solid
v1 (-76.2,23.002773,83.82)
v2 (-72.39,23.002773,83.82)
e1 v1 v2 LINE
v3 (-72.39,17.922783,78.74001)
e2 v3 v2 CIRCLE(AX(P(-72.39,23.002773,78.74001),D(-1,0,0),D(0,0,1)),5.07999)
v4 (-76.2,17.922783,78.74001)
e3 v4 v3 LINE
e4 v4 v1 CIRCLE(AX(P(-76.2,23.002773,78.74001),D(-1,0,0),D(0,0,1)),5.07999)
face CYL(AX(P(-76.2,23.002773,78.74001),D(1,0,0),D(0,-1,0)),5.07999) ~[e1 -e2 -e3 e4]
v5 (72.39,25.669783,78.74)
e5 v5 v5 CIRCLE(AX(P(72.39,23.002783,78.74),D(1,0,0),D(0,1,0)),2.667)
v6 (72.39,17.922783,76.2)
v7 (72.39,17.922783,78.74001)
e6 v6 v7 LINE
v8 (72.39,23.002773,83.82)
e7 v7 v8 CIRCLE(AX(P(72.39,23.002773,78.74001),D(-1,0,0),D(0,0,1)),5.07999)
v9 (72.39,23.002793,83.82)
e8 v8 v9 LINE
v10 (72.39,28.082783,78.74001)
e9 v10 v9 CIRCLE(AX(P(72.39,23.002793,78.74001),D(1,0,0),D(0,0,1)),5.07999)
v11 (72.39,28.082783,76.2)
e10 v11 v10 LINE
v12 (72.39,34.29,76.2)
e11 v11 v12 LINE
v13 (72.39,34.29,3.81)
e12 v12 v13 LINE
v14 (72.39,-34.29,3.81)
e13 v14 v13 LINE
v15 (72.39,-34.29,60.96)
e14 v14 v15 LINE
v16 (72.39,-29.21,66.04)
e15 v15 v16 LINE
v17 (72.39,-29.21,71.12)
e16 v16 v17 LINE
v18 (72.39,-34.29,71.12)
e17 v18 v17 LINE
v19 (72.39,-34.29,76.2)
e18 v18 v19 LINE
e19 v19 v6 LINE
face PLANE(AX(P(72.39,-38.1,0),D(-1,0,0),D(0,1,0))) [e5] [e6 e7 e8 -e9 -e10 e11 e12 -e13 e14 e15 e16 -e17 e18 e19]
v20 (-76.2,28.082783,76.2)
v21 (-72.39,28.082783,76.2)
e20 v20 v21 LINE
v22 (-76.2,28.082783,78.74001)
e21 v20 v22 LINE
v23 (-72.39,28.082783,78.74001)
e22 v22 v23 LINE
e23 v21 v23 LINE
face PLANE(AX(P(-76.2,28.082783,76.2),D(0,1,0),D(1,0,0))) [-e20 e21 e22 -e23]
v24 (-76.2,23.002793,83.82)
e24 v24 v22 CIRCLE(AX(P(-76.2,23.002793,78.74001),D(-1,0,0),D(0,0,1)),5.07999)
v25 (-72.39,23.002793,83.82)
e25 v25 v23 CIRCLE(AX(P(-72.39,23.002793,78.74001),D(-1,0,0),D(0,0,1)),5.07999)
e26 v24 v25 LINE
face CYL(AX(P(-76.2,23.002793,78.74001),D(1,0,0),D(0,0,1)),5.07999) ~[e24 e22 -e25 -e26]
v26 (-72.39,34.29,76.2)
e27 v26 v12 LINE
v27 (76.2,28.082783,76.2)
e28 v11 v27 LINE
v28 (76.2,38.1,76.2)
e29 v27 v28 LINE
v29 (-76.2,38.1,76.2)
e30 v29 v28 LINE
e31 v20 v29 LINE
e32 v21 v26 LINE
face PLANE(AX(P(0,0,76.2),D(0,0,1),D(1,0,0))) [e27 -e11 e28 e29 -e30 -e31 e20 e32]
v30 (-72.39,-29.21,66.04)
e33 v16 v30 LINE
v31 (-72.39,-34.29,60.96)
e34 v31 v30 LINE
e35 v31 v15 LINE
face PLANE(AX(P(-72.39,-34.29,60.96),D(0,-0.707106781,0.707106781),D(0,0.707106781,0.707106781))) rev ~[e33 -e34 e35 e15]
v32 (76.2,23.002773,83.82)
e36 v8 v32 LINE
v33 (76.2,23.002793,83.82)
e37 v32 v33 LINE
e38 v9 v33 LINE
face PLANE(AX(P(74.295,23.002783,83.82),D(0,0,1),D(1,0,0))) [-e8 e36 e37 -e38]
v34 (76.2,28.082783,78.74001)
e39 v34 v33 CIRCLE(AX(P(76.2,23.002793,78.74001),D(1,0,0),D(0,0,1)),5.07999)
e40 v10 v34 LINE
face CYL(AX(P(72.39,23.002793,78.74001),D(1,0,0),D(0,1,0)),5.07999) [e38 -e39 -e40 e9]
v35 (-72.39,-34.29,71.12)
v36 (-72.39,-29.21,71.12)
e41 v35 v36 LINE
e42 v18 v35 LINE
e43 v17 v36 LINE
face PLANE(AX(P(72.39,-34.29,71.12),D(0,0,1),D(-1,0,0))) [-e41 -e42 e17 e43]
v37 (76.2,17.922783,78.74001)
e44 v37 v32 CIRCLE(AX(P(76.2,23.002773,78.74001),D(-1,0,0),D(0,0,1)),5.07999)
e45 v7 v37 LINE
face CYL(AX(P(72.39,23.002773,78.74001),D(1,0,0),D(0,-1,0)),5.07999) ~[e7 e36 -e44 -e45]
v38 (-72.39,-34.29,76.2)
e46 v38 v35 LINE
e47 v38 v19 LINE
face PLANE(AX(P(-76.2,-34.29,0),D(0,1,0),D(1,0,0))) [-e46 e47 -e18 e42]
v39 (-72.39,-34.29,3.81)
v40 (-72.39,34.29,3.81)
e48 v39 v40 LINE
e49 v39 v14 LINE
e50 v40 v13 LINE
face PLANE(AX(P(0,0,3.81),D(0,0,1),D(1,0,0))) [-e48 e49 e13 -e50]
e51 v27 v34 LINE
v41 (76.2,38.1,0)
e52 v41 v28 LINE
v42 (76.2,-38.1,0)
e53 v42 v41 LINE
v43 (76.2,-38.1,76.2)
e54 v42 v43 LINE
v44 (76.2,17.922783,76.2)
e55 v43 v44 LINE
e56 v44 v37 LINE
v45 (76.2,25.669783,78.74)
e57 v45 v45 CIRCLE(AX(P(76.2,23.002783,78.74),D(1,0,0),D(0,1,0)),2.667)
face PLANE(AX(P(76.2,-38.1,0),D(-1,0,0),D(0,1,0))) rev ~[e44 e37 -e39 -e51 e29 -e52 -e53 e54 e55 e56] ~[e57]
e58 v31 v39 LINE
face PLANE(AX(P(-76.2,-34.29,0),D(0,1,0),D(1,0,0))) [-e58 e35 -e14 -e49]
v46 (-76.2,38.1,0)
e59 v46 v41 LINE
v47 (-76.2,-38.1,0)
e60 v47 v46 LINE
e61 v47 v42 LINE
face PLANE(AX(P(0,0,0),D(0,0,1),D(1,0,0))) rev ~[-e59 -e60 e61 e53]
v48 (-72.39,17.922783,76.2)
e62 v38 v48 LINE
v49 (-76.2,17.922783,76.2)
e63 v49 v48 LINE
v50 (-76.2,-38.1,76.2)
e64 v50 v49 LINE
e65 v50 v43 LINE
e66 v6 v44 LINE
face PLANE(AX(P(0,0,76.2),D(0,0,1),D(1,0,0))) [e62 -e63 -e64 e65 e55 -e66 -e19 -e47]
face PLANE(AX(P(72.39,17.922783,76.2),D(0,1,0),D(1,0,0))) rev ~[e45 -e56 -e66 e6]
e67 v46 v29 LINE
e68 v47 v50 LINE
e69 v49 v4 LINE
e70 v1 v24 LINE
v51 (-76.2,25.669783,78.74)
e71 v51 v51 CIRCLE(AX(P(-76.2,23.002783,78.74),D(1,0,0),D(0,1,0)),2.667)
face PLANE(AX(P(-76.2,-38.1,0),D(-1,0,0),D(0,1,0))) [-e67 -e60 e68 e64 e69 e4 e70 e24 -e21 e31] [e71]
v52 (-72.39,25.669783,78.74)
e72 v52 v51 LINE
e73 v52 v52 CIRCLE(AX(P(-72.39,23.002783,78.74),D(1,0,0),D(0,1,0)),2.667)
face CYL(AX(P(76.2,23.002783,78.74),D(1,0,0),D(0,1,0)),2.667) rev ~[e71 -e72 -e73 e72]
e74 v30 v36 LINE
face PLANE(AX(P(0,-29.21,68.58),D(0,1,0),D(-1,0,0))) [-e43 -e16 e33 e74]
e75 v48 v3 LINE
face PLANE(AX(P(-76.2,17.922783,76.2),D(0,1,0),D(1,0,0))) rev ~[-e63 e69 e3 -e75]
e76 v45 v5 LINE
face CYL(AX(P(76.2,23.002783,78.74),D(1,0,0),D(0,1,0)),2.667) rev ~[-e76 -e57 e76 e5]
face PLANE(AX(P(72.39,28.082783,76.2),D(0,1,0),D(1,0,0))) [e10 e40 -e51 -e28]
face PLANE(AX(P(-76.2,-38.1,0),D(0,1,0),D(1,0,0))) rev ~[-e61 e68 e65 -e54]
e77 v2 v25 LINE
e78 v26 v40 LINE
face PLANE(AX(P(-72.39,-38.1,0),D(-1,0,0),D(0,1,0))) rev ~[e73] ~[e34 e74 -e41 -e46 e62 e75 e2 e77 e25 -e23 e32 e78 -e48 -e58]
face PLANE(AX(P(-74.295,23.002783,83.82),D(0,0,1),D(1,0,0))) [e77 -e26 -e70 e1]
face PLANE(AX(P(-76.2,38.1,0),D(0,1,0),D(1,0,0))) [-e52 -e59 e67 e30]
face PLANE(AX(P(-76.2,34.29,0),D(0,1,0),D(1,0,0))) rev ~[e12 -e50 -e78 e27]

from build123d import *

# Parameters (mm, degrees)
F0_W      = 152.4
F0_H      = 76.2
F1_DEPTH  = 76.2
F2_T      = -3.81
F3_W      = 3.81
F3_H      = 10.16
F4_DEPTH  = 7.62
F5_R      = 2.667
F6_DEPTH  = 152.401
F7_R      = 5.07999
F8_W      = 144.78
F8_H      = 5.08
F9_DEPTH  = 5.08
F11_DEPTH = 144.78


# Not quite as in the source:
# - a fillet or chamfer is up to 0.001 mm smaller than in the source, because OpenCascade refuses the exact size


with BuildPart() as f1:
    # F0 (on Top) → F1 (new body)
    with BuildSketch(Plane.XY):
        Rectangle(F0_W, F0_H)
    extrude(amount=F1_DEPTH)

    # F2
    f2_openings = [f1.faces().sort_by_distance(p)[0] for p in [
        (0, 0, 76.2),
    ]]
    offset(amount=F2_T, openings=f2_openings)

    # F3 (on face) → F4 (join)
    with BuildSketch(Plane.XY.offset(76.2)):
        with Locations((-74.295, 23.0027831805)):
            Rectangle(F3_W, F3_H)
        with Locations((74.295, 23.0027831805)):
            Rectangle(F3_W, F3_H)
    extrude(amount=F4_DEPTH)

    # F5 (on face) → F6 (cut, through all)
    with BuildSketch(Plane.YZ.offset(76.2)):
        with Locations((23.0027831805, 78.74)):
            Circle(F5_R)
    extrude(amount=-F6_DEPTH, mode=Mode.SUBTRACT)

    # F7 (radius 5.08 in the source; OpenCascade refuses exactly that, so slightly less here)
    f7_edges = [f1.edges().sort_by_distance(p)[0] for p in [
        (74.295, 17.922783, 83.82),
        (74.295, 28.082783, 83.82),
        (-74.295, 28.082783, 83.82),
        (-74.295, 17.922783, 83.82),
    ]]
    fillet(f7_edges, radius=F7_R)

    # F8 (on face) → F9 (join)
    with BuildSketch(Plane(origin=(0, -34.29, 0), x_dir=(-1, 0, 0), z_dir=(0, 1, 0))):
        with Locations((0, 68.58)):
            Rectangle(F8_W, F8_H)
    extrude(amount=F9_DEPTH)

    # F10 (on face) → F11 (join)
    with BuildSketch(Plane.YZ.offset(-72.39)):
        Polygon((-34.29, 60.96), (-29.21, 66.04), (-34.29, 66.04), align=None)
    extrude(amount=F11_DEPTH)


solid = f1.part
